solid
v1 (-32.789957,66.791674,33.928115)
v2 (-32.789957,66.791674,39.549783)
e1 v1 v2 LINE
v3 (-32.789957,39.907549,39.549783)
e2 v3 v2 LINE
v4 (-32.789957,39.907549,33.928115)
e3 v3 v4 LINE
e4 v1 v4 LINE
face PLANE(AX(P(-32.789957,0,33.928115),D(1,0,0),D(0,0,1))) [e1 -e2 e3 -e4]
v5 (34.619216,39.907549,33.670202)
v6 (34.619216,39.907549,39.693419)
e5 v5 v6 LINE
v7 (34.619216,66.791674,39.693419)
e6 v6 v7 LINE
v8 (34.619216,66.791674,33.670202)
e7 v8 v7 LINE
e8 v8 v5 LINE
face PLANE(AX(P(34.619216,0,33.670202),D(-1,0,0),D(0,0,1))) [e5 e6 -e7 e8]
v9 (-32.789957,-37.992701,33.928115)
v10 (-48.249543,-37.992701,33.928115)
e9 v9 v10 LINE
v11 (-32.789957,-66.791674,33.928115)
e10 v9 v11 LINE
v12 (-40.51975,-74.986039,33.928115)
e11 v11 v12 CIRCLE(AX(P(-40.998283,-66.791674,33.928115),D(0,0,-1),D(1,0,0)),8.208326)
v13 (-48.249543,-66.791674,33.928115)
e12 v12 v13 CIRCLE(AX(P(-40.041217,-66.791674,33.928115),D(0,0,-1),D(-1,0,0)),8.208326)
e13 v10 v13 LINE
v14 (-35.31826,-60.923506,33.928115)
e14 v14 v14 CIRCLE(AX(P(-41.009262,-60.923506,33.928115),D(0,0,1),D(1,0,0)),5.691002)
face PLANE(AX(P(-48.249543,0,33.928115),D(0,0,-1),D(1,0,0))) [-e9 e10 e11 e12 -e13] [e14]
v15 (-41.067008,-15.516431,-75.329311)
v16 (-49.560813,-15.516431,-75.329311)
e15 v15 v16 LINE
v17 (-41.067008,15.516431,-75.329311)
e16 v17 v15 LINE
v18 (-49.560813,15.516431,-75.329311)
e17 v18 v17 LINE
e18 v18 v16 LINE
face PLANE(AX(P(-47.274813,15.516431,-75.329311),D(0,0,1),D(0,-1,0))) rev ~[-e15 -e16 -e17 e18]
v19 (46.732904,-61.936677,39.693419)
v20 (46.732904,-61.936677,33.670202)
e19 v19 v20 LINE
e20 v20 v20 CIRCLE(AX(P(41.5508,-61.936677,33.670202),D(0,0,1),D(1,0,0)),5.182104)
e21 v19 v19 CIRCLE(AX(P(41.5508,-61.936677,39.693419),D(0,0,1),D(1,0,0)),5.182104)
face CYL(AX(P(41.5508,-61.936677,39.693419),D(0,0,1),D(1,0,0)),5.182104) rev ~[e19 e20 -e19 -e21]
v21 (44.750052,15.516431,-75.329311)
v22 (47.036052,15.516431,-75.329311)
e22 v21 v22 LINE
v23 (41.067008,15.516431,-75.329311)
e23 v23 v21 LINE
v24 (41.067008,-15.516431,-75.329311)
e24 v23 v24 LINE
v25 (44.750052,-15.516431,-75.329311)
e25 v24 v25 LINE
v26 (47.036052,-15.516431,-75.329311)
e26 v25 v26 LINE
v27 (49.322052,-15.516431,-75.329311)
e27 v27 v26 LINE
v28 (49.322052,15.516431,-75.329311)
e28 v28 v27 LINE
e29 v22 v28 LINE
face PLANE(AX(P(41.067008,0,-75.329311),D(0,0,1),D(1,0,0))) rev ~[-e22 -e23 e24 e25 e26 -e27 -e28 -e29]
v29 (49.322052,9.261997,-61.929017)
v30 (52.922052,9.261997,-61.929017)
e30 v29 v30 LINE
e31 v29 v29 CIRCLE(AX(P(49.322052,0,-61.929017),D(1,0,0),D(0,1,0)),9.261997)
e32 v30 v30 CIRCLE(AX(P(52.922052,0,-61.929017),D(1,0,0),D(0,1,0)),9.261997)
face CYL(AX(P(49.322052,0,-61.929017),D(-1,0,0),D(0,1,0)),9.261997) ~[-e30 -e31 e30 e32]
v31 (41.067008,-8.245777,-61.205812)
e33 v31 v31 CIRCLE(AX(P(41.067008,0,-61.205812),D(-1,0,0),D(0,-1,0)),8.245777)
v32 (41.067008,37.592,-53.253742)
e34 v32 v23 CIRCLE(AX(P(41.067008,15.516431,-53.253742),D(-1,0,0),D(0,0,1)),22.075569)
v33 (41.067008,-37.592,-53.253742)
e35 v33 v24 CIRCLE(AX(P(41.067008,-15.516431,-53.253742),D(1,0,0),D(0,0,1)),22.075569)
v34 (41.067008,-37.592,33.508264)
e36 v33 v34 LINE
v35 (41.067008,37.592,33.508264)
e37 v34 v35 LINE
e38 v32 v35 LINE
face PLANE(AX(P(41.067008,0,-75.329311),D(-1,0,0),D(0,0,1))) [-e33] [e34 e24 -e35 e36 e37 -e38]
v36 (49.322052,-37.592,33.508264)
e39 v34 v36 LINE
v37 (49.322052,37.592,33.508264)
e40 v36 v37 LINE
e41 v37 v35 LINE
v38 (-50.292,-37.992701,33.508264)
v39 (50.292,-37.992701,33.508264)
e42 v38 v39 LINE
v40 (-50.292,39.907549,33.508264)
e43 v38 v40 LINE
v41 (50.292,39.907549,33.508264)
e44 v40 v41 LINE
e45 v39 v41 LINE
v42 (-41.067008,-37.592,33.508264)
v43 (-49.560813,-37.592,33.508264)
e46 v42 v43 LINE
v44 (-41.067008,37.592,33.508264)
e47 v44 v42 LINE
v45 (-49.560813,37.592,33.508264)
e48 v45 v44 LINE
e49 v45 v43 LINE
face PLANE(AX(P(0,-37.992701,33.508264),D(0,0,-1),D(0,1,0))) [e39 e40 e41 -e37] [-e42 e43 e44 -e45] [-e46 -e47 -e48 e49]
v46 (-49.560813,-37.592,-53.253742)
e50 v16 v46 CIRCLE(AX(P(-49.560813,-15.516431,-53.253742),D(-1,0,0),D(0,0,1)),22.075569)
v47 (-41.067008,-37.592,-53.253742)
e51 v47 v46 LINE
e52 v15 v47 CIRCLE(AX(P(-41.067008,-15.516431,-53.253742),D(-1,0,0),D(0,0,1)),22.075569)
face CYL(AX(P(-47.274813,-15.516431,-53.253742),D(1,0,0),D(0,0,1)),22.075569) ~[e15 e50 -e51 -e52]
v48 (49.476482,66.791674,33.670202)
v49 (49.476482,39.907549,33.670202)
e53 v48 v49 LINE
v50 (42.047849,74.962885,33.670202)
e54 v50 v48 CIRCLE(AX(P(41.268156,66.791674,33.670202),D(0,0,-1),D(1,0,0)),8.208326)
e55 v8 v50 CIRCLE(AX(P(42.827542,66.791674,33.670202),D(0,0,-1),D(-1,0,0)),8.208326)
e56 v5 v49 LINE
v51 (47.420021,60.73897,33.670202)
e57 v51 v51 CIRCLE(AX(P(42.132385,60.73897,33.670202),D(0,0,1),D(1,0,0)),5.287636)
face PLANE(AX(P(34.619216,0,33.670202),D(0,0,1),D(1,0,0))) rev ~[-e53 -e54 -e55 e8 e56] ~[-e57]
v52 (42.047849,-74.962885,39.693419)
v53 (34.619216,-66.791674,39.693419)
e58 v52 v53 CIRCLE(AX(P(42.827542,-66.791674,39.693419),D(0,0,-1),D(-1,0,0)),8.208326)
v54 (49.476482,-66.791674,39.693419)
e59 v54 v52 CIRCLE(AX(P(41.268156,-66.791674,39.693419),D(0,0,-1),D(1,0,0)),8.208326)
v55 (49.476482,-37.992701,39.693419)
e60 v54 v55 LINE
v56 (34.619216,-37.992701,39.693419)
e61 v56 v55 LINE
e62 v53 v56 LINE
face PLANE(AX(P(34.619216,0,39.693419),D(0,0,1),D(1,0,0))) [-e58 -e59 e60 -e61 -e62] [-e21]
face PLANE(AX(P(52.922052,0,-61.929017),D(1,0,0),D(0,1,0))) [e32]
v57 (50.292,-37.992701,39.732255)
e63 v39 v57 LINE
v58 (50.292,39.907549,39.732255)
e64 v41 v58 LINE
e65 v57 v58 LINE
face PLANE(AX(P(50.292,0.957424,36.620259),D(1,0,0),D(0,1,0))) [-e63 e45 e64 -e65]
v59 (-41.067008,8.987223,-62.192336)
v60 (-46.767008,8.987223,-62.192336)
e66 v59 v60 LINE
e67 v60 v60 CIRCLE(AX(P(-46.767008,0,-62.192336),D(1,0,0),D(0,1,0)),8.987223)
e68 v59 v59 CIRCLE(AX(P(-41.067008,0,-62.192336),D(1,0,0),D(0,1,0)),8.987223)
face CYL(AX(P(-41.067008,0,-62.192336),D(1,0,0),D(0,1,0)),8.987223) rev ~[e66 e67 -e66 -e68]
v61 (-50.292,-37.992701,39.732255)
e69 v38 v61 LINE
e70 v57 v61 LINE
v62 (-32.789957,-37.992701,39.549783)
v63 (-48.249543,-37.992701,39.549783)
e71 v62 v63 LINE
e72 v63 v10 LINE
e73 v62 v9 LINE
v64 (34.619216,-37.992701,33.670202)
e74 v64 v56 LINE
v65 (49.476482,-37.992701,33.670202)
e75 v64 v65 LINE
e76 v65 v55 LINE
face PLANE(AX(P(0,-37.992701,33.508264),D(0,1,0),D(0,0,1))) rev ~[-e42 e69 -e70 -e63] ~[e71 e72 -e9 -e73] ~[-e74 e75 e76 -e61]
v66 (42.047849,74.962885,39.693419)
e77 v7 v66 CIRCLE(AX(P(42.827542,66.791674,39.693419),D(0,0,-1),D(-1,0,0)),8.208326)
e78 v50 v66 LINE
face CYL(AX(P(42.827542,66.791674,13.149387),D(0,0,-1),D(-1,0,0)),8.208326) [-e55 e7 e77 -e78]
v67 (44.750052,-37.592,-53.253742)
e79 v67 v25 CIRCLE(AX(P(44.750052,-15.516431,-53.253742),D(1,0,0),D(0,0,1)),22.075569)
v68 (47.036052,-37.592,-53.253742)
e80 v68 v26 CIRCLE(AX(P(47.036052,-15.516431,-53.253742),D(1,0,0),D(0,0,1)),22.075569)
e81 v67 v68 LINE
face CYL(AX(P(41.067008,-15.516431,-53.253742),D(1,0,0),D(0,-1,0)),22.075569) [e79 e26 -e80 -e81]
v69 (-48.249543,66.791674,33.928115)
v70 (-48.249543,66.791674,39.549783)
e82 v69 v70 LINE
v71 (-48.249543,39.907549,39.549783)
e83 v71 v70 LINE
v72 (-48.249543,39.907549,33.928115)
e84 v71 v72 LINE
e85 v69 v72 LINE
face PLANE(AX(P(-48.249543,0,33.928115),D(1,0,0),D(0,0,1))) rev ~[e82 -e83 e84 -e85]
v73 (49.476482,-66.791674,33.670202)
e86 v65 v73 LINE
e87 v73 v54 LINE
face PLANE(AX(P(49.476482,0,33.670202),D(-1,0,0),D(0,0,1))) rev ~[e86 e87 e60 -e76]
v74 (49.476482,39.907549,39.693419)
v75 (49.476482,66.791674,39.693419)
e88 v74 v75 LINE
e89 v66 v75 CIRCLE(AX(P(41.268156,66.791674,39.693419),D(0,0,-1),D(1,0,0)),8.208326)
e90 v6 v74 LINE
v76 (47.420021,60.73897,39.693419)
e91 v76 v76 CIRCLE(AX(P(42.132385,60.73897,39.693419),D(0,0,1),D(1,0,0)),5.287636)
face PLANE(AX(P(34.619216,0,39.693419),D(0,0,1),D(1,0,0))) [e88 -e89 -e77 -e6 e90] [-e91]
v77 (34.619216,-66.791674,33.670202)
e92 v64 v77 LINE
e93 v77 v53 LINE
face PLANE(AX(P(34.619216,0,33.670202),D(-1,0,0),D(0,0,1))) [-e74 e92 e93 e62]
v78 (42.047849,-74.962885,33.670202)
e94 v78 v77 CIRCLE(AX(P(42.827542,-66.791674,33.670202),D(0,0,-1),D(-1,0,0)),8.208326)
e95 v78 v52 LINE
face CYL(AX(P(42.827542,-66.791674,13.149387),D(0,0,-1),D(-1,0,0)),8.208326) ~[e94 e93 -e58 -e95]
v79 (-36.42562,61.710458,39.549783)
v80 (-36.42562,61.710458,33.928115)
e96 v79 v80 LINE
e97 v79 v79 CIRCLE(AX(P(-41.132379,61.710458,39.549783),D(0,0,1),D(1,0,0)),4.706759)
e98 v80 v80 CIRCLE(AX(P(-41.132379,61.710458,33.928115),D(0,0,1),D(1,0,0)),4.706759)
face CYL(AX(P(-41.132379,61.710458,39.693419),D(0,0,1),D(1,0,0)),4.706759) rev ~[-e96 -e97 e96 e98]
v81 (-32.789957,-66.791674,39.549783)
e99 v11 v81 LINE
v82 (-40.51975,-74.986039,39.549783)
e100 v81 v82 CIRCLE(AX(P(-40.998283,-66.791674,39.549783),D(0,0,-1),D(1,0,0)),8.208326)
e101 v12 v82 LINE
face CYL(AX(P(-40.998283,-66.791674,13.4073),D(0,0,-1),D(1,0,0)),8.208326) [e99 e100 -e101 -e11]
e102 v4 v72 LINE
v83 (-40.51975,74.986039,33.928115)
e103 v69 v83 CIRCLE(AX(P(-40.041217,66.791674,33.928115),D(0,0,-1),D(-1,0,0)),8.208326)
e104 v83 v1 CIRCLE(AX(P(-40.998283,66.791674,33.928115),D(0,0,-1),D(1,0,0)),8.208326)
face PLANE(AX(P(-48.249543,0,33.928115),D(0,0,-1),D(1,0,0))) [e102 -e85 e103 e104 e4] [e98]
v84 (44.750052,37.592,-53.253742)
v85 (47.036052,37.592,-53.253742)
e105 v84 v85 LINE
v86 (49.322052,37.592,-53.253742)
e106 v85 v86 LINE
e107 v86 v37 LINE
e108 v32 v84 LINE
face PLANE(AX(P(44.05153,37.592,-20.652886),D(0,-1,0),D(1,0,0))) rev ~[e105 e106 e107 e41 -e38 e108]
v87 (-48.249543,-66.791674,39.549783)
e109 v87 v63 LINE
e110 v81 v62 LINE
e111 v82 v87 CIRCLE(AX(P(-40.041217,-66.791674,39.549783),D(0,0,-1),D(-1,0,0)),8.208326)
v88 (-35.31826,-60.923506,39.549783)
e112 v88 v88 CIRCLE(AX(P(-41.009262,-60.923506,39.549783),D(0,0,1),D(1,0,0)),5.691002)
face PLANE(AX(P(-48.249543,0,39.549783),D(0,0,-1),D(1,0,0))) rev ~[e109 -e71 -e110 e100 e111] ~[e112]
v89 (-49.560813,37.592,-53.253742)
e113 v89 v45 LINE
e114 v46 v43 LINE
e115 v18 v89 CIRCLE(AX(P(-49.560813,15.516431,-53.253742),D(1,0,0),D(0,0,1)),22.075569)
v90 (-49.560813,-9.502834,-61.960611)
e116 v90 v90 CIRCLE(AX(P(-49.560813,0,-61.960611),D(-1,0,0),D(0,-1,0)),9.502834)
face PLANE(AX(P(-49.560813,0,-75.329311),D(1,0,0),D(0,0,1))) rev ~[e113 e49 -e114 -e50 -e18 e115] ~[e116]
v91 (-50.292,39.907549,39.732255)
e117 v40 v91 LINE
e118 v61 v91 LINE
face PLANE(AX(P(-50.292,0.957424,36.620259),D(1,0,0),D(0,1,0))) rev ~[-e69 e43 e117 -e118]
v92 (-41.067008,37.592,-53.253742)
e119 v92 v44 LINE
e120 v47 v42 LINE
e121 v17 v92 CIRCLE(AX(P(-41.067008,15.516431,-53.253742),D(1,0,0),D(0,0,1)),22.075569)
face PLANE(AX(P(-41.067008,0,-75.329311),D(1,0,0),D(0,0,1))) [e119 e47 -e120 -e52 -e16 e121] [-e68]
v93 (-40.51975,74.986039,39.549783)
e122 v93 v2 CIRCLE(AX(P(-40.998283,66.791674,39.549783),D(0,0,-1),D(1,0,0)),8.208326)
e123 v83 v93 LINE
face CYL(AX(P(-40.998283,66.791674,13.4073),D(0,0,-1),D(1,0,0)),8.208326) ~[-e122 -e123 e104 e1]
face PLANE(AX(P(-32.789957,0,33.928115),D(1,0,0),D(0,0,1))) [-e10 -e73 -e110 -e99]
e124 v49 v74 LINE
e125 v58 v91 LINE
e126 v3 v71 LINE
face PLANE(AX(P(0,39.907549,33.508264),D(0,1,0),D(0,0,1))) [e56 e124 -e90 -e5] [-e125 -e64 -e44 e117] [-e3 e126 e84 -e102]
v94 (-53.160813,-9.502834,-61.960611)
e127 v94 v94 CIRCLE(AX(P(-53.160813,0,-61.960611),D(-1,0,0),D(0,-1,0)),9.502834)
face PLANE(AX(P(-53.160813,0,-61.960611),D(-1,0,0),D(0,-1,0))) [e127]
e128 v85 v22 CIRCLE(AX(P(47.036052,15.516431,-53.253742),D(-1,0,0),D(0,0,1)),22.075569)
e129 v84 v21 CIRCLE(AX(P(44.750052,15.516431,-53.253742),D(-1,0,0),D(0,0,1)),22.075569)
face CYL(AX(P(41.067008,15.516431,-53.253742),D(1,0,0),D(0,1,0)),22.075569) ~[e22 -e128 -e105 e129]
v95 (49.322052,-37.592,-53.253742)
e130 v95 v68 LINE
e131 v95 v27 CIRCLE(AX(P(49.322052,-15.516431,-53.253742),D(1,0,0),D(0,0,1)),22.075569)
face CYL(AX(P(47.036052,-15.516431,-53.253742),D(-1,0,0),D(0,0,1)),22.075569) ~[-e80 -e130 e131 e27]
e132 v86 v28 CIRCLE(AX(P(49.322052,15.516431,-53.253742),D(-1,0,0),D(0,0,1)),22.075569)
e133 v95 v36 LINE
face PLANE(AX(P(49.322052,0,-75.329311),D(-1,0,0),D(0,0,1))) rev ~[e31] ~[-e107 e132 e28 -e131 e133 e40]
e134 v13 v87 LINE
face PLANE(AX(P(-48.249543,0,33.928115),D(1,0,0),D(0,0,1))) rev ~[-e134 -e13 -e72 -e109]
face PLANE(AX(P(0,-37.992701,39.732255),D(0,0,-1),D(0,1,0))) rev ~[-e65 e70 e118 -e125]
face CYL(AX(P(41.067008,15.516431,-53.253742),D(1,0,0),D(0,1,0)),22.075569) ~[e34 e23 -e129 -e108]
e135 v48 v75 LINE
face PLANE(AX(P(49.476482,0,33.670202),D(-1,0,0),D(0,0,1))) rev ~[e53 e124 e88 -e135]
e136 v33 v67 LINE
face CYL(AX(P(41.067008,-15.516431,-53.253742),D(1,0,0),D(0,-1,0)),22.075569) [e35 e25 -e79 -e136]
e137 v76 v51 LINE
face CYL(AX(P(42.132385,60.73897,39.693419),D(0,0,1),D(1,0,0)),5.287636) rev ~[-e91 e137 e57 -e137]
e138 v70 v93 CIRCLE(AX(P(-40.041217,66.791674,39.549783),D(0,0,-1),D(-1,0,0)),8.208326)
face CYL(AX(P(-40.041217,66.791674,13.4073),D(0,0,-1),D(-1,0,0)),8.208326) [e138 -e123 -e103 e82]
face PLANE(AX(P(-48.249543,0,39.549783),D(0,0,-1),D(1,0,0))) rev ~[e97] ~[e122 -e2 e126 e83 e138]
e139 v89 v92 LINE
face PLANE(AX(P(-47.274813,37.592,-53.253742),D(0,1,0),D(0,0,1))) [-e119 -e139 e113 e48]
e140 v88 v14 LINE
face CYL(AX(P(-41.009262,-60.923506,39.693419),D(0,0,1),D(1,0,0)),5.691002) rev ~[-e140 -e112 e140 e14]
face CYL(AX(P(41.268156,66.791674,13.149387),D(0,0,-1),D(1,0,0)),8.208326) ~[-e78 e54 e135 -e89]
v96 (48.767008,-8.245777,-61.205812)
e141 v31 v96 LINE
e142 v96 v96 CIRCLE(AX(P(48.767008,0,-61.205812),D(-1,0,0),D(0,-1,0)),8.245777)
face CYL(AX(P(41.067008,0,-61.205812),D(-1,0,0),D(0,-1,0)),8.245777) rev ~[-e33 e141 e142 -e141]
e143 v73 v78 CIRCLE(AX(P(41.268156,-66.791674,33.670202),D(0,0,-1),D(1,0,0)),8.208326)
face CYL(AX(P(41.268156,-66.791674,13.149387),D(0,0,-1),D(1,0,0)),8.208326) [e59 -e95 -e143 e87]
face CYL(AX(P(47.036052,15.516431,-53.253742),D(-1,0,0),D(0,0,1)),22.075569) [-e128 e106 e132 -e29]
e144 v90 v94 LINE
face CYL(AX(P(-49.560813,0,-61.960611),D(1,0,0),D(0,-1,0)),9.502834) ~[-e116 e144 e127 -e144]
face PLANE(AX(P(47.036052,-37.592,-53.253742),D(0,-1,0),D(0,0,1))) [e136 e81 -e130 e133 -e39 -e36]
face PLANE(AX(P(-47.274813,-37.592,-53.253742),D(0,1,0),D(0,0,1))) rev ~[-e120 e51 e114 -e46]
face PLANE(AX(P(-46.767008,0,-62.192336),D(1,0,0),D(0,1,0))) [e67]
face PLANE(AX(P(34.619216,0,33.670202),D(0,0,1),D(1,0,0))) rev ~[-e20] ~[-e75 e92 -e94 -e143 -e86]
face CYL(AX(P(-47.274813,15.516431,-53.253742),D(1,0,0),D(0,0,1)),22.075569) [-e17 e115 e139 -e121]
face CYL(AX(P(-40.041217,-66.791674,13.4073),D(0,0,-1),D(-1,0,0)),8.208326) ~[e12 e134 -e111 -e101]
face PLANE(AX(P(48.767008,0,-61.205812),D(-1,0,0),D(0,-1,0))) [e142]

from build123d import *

# Parameters (mm, degrees)
F0_W         = 77.900249511
F0_H         = 6.2239915133
F1_DEPTH     = 50.292
F2_W         = 5.9690438211
F2_H         = 109.3528494239
F2_W_2       = 6.2078051269
F2_H_2       = 109.8303757608
F3_DEPTH     = 37.592
F4_R         = 22.0755688143
F5_DEPTH     = 2.286
F7_R         = 9.5028337992
F8_DEPTH     = 3.6
F6_R         = 9.2619968466
F9_DEPTH     = 3.6
F10_R        = 8.2457773543
F12_DEPTH    = 7.7
F11_R        = 8.9872233932
F13_DEPTH    = 5.7
F14_W        = 14.8572660983
F14_H        = 6.0232169926
F14_W_2      = 15.4595859349
F14_H_2      = 5.6216679513
F15_DEPTH    = 75
F16_T1_DEPTH = 46.6632985117
F16_T3_DEPTH = 47.064847553
F17_R        = 4.7067592452
F17_R_2      = 5.2876360091
F17_R_3      = 5.6910023403
F17_R_4      = 5.1821036644
F18_DEPTH    = 25


# Not quite as in the source:
# - a fillet or chamfer that OpenCascade refuses, or shapes differently, is made with other operations: its cross-section is extruded or revolved along the edge and cut away or added


with BuildPart() as f1:
    # F0 (on Right) → F1 (new body, symmetric)
    with BuildSketch(Plane.YZ):
        with Locations((0.9574238211, 36.620259285)):
            Rectangle(F0_W, F0_H)
    extrude(amount=F1_DEPTH, both=True)

    # F2 (on Front) → F3 (join, symmetric)
    with BuildSketch(Plane.XZ):
        with Locations((44.0515298396, -20.6528864801)):
            Rectangle(F2_W, F2_H)
        with Locations((-44.1709104925, -20.4141233116)):
            Rectangle(F2_W_2, F2_H_2)
    extrude(amount=F3_DEPTH, both=True)

    # F4
    f4_edges = [f1.edges().sort_by_distance(p)[0] for p in [
        (44.05153, 37.592, -75.329311),
        (44.05153, -37.592, -75.329311),
        (-44.17091, -37.592, -75.329311),
        (-44.17091, 37.592, -75.329311),
    ]]
    fillet(f4_edges, radius=F4_R)

    # F5 (add, symmetric): faces of the model
    f5_faces = [f1.faces().sort_by_distance(p)[0] for p in [
        (47.0360517502, 0, -19.6123684117),
        (-47.274813056, 0, -19.6123684117),
    ]]
    extrude(f5_faces, amount=F5_DEPTH, both=True, dir=(1, 0, 0))

    # F7 (on face) → F8 (join)
    with BuildSketch(Plane(origin=(-49.560813056, 0, 0), x_dir=(0, -1, 0), z_dir=(-1, 0, 0))):
        with Locations((0, -61.9606114924)):
            Circle(F7_R)
    extrude(amount=F8_DEPTH)

    # F6 (on face) → F9 (join)
    with BuildSketch(Plane.YZ.offset(49.3220517502)):
        with Locations((0, -61.9290173054)):
            Circle(F6_R)
    extrude(amount=F9_DEPTH)

    # F10 (on face) → F12 (cut)
    with BuildSketch(Plane(origin=(41.0670079291, 0, 0), x_dir=(0, -1, 0), z_dir=(-1, 0, 0))):
        with Locations((0, -61.2058117986)):
            Circle(F10_R)
    extrude(amount=-F12_DEPTH, mode=Mode.SUBTRACT)

    # F11 (on face) → F13 (cut)
    with BuildSketch(Plane.YZ.offset(-41.0670079291)):
        with Locations((0, -62.1923357248)):
            Circle(F11_R)
    extrude(amount=-F13_DEPTH, mode=Mode.SUBTRACT)

    # F14 (on Front) → F15 (join, symmetric)
    with BuildSketch(Plane.XZ):
        with Locations((42.047848925, 36.6818103939)):
            Rectangle(F14_W, F14_H)
        with Locations((-40.5197497457, 36.7389488965)):
            Rectangle(F14_W_2, F14_H_2)
    extrude(amount=F15_DEPTH, both=True)

    # F16: fillet of radius 8.2083261121 on 8 edges, made by hand

    # F16_s2 → F16_t1 (cut)
    with BuildSketch(Plane.XY.offset(13.4072996407)):
        with BuildLine():
            ThreePointArc((-32.7899567783, 66.7916738879), (-35.1941198343, 72.595836944), (-40.9982828904, 75))
            Line((-40.9982828904, 75), (-32.7899567783, 75))
            Line((-32.7899567783, 75), (-32.7899567783, 66.7916738879))
        make_face()
        with BuildLine():
            ThreePointArc((-48.2495427132, 66.7916738879), (-45.8453796571, 72.595836944), (-40.0412166011, 75))
            Line((-40.0412166011, 75), (-48.2495427132, 75))
            Line((-48.2495427132, 75), (-48.2495427132, 66.7916738879))
        make_face()
        with BuildLine():
            ThreePointArc((-48.2495427132, -66.7916738879), (-45.8453796571, -72.595836944), (-40.0412166011, -75))
            Line((-40.0412166011, -75), (-48.2495427132, -75))
            Line((-48.2495427132, -75), (-48.2495427132, -66.7916738879))
        make_face()
        with BuildLine():
            ThreePointArc((-32.7899567783, -66.7916738879), (-35.1941198343, -72.595836944), (-40.9982828904, -75))
            Line((-40.9982828904, -75), (-32.7899567783, -75))
            Line((-32.7899567783, -75), (-32.7899567783, -66.7916738879))
        make_face()
    extrude(amount=F16_T1_DEPTH, mode=Mode.SUBTRACT)

    # F16_s4 → F16_t3 (cut)
    with BuildSketch(Plane.XY.offset(13.1493866174)):
        with BuildLine():
            ThreePointArc((49.4764819741, 66.7916738879), (47.0723189181, 72.595836944), (41.2681558621, 75))
            Line((41.2681558621, 75), (49.4764819741, 75))
            Line((49.4764819741, 75), (49.4764819741, 66.7916738879))
        make_face()
        with BuildLine():
            ThreePointArc((34.6192158759, 66.7916738879), (37.0233789319, 72.595836944), (42.8275419879, 75))
            Line((42.8275419879, 75), (34.6192158759, 75))
            Line((34.6192158759, 75), (34.6192158759, 66.7916738879))
        make_face()
        with BuildLine():
            ThreePointArc((49.4764819741, -66.7916738879), (47.0723189181, -72.595836944), (41.2681558621, -75))
            Line((41.2681558621, -75), (49.4764819741, -75))
            Line((49.4764819741, -75), (49.4764819741, -66.7916738879))
        make_face()
        with BuildLine():
            ThreePointArc((34.6192158759, -66.7916738879), (37.0233789319, -72.595836944), (42.8275419879, -75))
            Line((42.8275419879, -75), (34.6192158759, -75))
            Line((34.6192158759, -75), (34.6192158759, -66.7916738879))
        make_face()
    extrude(amount=F16_T3_DEPTH, mode=Mode.SUBTRACT)

    # F17 (on face) → F18 (cut)
    with BuildSketch(Plane.XY.offset(39.6934188902)):
        with Locations((-41.1323793232, 61.7104582489)):
            Circle(F17_R)
        with Locations((42.1323850751, 60.7389695942)):
            Circle(F17_R_2)
        with Locations((-41.0092622042, -60.9235055745)):
            Circle(F17_R_3)
        with Locations((41.5508002043, -61.9366765022)):
            Circle(F17_R_4)
    extrude(amount=-F18_DEPTH, mode=Mode.SUBTRACT)


solid = f1.part
